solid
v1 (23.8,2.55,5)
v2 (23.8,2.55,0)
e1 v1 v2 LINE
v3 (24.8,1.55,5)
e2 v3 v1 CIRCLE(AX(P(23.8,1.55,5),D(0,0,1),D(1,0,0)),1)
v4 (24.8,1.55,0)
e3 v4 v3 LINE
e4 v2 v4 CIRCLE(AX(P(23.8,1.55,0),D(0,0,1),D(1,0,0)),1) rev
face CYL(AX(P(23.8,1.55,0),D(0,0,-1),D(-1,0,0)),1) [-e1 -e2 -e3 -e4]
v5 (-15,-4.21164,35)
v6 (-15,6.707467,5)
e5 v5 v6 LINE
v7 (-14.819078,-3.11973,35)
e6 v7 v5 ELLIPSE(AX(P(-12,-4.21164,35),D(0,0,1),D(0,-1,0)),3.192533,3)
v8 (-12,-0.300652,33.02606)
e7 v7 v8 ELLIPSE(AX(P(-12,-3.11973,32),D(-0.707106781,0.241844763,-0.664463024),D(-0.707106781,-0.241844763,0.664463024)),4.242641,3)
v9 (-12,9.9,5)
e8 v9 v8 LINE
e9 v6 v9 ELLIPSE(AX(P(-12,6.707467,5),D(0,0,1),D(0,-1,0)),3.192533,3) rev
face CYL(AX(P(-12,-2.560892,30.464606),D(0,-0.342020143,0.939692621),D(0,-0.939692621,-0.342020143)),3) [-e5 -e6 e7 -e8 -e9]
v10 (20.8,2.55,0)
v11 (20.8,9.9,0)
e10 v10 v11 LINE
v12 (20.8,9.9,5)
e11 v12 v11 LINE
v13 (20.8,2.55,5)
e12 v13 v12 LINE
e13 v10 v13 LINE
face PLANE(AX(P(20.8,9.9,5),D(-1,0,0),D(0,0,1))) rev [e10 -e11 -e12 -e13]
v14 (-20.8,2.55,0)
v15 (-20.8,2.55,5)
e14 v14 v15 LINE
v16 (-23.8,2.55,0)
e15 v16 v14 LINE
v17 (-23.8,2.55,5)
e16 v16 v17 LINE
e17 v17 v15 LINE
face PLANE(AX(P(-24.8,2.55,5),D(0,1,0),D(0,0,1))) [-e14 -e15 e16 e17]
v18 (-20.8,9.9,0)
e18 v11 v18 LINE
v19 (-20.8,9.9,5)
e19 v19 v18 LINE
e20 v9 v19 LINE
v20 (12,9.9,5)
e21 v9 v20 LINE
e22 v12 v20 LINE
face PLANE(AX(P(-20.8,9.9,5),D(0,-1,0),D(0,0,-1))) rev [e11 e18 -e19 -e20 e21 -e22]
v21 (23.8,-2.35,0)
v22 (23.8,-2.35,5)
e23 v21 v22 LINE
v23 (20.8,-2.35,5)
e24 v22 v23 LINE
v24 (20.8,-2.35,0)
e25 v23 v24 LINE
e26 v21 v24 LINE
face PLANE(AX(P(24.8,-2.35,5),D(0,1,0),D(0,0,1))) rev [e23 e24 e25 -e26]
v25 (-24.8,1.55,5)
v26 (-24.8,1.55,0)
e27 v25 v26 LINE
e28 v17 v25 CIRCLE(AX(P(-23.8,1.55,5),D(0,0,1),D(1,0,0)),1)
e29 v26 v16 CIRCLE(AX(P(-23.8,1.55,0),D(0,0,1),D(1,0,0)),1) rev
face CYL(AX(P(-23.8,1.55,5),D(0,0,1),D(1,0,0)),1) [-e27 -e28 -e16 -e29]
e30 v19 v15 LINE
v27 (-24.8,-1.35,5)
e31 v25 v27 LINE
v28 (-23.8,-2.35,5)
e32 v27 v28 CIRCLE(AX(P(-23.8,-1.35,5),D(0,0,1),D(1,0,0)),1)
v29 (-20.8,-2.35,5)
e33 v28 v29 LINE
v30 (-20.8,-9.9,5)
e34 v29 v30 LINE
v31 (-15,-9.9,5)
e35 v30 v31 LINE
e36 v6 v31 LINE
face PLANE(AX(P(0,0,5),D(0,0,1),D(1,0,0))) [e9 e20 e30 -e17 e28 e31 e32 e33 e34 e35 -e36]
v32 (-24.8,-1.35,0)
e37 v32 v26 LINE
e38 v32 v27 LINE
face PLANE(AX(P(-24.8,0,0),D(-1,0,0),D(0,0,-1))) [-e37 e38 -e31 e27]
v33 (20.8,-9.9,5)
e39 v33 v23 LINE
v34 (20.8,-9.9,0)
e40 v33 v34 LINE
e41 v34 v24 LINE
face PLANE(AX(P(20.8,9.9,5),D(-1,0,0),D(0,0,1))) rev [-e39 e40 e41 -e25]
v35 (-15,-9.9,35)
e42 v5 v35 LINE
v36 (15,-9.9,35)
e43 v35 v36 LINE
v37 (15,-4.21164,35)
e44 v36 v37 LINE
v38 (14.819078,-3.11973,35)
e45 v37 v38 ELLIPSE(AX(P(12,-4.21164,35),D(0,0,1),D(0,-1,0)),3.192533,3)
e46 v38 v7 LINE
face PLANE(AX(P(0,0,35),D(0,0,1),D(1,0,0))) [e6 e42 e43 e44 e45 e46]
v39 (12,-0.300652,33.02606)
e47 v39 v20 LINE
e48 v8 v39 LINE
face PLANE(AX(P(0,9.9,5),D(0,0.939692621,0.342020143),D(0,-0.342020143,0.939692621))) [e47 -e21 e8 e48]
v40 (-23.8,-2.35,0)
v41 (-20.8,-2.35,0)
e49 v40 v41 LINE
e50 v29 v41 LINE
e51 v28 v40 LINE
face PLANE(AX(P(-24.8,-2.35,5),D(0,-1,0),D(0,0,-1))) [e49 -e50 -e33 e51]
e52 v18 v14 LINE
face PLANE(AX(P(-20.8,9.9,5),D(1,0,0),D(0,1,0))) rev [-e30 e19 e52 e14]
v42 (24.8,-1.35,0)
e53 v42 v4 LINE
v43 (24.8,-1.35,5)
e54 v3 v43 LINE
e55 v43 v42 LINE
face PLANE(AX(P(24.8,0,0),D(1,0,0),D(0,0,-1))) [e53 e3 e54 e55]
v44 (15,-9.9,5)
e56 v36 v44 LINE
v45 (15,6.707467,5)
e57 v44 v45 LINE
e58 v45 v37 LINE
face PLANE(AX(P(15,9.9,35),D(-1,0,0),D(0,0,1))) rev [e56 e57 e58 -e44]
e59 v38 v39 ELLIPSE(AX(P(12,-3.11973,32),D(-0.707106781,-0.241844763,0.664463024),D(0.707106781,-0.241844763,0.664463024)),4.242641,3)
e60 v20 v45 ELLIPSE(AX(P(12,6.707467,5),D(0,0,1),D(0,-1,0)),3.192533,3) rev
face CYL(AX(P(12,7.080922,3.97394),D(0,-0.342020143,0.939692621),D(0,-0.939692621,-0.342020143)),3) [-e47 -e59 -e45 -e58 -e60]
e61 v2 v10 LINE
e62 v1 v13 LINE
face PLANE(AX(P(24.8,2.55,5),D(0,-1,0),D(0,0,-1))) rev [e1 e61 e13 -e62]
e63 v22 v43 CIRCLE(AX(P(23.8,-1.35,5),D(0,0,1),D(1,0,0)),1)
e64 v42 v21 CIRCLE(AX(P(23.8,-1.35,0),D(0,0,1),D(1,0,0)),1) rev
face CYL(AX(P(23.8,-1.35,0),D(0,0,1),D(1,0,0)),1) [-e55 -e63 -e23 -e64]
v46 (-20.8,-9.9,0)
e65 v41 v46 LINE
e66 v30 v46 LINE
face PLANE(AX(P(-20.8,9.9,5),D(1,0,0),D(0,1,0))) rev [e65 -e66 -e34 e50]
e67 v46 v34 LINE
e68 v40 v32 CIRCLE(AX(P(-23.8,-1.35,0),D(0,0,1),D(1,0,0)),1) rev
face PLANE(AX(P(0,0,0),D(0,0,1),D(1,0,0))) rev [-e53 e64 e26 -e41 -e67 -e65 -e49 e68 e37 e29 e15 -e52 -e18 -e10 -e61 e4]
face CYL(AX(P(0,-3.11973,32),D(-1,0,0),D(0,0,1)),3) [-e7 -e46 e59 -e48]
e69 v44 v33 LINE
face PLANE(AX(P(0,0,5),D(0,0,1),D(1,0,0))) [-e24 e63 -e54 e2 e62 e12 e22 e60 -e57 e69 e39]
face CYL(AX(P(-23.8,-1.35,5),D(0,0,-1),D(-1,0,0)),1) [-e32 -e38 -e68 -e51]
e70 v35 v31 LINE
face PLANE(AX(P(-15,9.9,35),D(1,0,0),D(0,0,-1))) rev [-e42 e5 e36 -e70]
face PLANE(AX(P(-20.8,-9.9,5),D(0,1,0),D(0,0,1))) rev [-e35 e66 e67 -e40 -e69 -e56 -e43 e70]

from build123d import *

# Parameters (mm, degrees)
SKETCH_1_W             = 41.6
SKETCH_1_H             = 19.8
EXTRUDE_1_DEPTH        = 5
SKETCH_2_W             = 5
SKETCH_2_H             = 4.9
EXTRUDE_2_DEPTH        = 4
FILLET_1_R             = 1
FILLET_1_OF_MIRROR_1_R = 1
SKETCH_3_W             = 30
SKETCH_3_H             = 19.8
EXTRUDE_3_DEPTH        = 30
DRAFT_START            = 11.013057662
DRAFT_1_OUTLINE_W      = 30
DRAFT_1_OUTLINE_H      = 35
DRAFT_1_DEPTH          = 10.2606043
FILLET_2_R             = 3


# Read off the part's stored shape, not the designer's step: 구배1
with BuildPart() as part:
    # 스케치1 → 보스-돌출1 (new body)
    with BuildSketch(Plane.XY):
        Rectangle(SKETCH_1_W, SKETCH_1_H)
    extrude(amount=EXTRUDE_1_DEPTH)

    # 스케치2 → 보스-돌출2 (add)
    with BuildSketch(Plane(origin=(20.8, 0, 0), x_dir=(0, 0, -1), z_dir=(1, 0, 0))):
        with Locations((-2.5, 0.1)):
            Rectangle(SKETCH_2_W, SKETCH_2_H)
    extrude_2 = extrude(amount=EXTRUDE_2_DEPTH)

    # 필렛1
    fillet_1_edges = [part.edges().sort_by_distance(p)[0] for p in [
        (24.8, 2.55, 2.5),
        (24.8, -2.35, 2.5),
    ]]
    fillet(fillet_1_edges, radius=FILLET_1_R)

    # 대칭 복사1: 보스-돌출2 across plane
    add(extrude_2.mirror(Plane(origin=(0, 0, 0), x_dir=(0, 0, 1), z_dir=(1, 0, 0))))

    # 필렛1 of 대칭 복사1
    fillet_1_of_mirror_1_edges = [part.edges().sort_by_distance(p)[0] for p in [
        (-24.8, 2.55, 2.5),
        (-24.8, -2.35, 2.5),
    ]]
    fillet(fillet_1_of_mirror_1_edges, radius=FILLET_1_OF_MIRROR_1_R)

    # 스케치3 → 보스-돌출3 (add)
    with BuildSketch(Plane.XY.offset(5)):
        Rectangle(SKETCH_3_W, SKETCH_3_H)
    extrude(amount=EXTRUDE_3_DEPTH)

    # 구배1 outline → 구배1 (cut)
    with BuildSketch(Plane(origin=(0, 0, 0), x_dir=(1, 0, 0), z_dir=(0, 0.9396926207859083, 0.3420201433256691)).offset(DRAFT_START)):
        with Locations((0, -17.5)):
            Rectangle(DRAFT_1_OUTLINE_W, DRAFT_1_OUTLINE_H)
    extrude(amount=DRAFT_1_DEPTH, mode=Mode.SUBTRACT)

    # 필렛2
    fillet_2_edges = [part.edges().sort_by_distance(p)[0] for p in [
        (15, 4.440446486, 20),
        (-15, 4.440446486, 20),
        (0, -1.019107028, 35),
    ]]
    fillet(fillet_2_edges, radius=FILLET_2_R)


solid = part.part
